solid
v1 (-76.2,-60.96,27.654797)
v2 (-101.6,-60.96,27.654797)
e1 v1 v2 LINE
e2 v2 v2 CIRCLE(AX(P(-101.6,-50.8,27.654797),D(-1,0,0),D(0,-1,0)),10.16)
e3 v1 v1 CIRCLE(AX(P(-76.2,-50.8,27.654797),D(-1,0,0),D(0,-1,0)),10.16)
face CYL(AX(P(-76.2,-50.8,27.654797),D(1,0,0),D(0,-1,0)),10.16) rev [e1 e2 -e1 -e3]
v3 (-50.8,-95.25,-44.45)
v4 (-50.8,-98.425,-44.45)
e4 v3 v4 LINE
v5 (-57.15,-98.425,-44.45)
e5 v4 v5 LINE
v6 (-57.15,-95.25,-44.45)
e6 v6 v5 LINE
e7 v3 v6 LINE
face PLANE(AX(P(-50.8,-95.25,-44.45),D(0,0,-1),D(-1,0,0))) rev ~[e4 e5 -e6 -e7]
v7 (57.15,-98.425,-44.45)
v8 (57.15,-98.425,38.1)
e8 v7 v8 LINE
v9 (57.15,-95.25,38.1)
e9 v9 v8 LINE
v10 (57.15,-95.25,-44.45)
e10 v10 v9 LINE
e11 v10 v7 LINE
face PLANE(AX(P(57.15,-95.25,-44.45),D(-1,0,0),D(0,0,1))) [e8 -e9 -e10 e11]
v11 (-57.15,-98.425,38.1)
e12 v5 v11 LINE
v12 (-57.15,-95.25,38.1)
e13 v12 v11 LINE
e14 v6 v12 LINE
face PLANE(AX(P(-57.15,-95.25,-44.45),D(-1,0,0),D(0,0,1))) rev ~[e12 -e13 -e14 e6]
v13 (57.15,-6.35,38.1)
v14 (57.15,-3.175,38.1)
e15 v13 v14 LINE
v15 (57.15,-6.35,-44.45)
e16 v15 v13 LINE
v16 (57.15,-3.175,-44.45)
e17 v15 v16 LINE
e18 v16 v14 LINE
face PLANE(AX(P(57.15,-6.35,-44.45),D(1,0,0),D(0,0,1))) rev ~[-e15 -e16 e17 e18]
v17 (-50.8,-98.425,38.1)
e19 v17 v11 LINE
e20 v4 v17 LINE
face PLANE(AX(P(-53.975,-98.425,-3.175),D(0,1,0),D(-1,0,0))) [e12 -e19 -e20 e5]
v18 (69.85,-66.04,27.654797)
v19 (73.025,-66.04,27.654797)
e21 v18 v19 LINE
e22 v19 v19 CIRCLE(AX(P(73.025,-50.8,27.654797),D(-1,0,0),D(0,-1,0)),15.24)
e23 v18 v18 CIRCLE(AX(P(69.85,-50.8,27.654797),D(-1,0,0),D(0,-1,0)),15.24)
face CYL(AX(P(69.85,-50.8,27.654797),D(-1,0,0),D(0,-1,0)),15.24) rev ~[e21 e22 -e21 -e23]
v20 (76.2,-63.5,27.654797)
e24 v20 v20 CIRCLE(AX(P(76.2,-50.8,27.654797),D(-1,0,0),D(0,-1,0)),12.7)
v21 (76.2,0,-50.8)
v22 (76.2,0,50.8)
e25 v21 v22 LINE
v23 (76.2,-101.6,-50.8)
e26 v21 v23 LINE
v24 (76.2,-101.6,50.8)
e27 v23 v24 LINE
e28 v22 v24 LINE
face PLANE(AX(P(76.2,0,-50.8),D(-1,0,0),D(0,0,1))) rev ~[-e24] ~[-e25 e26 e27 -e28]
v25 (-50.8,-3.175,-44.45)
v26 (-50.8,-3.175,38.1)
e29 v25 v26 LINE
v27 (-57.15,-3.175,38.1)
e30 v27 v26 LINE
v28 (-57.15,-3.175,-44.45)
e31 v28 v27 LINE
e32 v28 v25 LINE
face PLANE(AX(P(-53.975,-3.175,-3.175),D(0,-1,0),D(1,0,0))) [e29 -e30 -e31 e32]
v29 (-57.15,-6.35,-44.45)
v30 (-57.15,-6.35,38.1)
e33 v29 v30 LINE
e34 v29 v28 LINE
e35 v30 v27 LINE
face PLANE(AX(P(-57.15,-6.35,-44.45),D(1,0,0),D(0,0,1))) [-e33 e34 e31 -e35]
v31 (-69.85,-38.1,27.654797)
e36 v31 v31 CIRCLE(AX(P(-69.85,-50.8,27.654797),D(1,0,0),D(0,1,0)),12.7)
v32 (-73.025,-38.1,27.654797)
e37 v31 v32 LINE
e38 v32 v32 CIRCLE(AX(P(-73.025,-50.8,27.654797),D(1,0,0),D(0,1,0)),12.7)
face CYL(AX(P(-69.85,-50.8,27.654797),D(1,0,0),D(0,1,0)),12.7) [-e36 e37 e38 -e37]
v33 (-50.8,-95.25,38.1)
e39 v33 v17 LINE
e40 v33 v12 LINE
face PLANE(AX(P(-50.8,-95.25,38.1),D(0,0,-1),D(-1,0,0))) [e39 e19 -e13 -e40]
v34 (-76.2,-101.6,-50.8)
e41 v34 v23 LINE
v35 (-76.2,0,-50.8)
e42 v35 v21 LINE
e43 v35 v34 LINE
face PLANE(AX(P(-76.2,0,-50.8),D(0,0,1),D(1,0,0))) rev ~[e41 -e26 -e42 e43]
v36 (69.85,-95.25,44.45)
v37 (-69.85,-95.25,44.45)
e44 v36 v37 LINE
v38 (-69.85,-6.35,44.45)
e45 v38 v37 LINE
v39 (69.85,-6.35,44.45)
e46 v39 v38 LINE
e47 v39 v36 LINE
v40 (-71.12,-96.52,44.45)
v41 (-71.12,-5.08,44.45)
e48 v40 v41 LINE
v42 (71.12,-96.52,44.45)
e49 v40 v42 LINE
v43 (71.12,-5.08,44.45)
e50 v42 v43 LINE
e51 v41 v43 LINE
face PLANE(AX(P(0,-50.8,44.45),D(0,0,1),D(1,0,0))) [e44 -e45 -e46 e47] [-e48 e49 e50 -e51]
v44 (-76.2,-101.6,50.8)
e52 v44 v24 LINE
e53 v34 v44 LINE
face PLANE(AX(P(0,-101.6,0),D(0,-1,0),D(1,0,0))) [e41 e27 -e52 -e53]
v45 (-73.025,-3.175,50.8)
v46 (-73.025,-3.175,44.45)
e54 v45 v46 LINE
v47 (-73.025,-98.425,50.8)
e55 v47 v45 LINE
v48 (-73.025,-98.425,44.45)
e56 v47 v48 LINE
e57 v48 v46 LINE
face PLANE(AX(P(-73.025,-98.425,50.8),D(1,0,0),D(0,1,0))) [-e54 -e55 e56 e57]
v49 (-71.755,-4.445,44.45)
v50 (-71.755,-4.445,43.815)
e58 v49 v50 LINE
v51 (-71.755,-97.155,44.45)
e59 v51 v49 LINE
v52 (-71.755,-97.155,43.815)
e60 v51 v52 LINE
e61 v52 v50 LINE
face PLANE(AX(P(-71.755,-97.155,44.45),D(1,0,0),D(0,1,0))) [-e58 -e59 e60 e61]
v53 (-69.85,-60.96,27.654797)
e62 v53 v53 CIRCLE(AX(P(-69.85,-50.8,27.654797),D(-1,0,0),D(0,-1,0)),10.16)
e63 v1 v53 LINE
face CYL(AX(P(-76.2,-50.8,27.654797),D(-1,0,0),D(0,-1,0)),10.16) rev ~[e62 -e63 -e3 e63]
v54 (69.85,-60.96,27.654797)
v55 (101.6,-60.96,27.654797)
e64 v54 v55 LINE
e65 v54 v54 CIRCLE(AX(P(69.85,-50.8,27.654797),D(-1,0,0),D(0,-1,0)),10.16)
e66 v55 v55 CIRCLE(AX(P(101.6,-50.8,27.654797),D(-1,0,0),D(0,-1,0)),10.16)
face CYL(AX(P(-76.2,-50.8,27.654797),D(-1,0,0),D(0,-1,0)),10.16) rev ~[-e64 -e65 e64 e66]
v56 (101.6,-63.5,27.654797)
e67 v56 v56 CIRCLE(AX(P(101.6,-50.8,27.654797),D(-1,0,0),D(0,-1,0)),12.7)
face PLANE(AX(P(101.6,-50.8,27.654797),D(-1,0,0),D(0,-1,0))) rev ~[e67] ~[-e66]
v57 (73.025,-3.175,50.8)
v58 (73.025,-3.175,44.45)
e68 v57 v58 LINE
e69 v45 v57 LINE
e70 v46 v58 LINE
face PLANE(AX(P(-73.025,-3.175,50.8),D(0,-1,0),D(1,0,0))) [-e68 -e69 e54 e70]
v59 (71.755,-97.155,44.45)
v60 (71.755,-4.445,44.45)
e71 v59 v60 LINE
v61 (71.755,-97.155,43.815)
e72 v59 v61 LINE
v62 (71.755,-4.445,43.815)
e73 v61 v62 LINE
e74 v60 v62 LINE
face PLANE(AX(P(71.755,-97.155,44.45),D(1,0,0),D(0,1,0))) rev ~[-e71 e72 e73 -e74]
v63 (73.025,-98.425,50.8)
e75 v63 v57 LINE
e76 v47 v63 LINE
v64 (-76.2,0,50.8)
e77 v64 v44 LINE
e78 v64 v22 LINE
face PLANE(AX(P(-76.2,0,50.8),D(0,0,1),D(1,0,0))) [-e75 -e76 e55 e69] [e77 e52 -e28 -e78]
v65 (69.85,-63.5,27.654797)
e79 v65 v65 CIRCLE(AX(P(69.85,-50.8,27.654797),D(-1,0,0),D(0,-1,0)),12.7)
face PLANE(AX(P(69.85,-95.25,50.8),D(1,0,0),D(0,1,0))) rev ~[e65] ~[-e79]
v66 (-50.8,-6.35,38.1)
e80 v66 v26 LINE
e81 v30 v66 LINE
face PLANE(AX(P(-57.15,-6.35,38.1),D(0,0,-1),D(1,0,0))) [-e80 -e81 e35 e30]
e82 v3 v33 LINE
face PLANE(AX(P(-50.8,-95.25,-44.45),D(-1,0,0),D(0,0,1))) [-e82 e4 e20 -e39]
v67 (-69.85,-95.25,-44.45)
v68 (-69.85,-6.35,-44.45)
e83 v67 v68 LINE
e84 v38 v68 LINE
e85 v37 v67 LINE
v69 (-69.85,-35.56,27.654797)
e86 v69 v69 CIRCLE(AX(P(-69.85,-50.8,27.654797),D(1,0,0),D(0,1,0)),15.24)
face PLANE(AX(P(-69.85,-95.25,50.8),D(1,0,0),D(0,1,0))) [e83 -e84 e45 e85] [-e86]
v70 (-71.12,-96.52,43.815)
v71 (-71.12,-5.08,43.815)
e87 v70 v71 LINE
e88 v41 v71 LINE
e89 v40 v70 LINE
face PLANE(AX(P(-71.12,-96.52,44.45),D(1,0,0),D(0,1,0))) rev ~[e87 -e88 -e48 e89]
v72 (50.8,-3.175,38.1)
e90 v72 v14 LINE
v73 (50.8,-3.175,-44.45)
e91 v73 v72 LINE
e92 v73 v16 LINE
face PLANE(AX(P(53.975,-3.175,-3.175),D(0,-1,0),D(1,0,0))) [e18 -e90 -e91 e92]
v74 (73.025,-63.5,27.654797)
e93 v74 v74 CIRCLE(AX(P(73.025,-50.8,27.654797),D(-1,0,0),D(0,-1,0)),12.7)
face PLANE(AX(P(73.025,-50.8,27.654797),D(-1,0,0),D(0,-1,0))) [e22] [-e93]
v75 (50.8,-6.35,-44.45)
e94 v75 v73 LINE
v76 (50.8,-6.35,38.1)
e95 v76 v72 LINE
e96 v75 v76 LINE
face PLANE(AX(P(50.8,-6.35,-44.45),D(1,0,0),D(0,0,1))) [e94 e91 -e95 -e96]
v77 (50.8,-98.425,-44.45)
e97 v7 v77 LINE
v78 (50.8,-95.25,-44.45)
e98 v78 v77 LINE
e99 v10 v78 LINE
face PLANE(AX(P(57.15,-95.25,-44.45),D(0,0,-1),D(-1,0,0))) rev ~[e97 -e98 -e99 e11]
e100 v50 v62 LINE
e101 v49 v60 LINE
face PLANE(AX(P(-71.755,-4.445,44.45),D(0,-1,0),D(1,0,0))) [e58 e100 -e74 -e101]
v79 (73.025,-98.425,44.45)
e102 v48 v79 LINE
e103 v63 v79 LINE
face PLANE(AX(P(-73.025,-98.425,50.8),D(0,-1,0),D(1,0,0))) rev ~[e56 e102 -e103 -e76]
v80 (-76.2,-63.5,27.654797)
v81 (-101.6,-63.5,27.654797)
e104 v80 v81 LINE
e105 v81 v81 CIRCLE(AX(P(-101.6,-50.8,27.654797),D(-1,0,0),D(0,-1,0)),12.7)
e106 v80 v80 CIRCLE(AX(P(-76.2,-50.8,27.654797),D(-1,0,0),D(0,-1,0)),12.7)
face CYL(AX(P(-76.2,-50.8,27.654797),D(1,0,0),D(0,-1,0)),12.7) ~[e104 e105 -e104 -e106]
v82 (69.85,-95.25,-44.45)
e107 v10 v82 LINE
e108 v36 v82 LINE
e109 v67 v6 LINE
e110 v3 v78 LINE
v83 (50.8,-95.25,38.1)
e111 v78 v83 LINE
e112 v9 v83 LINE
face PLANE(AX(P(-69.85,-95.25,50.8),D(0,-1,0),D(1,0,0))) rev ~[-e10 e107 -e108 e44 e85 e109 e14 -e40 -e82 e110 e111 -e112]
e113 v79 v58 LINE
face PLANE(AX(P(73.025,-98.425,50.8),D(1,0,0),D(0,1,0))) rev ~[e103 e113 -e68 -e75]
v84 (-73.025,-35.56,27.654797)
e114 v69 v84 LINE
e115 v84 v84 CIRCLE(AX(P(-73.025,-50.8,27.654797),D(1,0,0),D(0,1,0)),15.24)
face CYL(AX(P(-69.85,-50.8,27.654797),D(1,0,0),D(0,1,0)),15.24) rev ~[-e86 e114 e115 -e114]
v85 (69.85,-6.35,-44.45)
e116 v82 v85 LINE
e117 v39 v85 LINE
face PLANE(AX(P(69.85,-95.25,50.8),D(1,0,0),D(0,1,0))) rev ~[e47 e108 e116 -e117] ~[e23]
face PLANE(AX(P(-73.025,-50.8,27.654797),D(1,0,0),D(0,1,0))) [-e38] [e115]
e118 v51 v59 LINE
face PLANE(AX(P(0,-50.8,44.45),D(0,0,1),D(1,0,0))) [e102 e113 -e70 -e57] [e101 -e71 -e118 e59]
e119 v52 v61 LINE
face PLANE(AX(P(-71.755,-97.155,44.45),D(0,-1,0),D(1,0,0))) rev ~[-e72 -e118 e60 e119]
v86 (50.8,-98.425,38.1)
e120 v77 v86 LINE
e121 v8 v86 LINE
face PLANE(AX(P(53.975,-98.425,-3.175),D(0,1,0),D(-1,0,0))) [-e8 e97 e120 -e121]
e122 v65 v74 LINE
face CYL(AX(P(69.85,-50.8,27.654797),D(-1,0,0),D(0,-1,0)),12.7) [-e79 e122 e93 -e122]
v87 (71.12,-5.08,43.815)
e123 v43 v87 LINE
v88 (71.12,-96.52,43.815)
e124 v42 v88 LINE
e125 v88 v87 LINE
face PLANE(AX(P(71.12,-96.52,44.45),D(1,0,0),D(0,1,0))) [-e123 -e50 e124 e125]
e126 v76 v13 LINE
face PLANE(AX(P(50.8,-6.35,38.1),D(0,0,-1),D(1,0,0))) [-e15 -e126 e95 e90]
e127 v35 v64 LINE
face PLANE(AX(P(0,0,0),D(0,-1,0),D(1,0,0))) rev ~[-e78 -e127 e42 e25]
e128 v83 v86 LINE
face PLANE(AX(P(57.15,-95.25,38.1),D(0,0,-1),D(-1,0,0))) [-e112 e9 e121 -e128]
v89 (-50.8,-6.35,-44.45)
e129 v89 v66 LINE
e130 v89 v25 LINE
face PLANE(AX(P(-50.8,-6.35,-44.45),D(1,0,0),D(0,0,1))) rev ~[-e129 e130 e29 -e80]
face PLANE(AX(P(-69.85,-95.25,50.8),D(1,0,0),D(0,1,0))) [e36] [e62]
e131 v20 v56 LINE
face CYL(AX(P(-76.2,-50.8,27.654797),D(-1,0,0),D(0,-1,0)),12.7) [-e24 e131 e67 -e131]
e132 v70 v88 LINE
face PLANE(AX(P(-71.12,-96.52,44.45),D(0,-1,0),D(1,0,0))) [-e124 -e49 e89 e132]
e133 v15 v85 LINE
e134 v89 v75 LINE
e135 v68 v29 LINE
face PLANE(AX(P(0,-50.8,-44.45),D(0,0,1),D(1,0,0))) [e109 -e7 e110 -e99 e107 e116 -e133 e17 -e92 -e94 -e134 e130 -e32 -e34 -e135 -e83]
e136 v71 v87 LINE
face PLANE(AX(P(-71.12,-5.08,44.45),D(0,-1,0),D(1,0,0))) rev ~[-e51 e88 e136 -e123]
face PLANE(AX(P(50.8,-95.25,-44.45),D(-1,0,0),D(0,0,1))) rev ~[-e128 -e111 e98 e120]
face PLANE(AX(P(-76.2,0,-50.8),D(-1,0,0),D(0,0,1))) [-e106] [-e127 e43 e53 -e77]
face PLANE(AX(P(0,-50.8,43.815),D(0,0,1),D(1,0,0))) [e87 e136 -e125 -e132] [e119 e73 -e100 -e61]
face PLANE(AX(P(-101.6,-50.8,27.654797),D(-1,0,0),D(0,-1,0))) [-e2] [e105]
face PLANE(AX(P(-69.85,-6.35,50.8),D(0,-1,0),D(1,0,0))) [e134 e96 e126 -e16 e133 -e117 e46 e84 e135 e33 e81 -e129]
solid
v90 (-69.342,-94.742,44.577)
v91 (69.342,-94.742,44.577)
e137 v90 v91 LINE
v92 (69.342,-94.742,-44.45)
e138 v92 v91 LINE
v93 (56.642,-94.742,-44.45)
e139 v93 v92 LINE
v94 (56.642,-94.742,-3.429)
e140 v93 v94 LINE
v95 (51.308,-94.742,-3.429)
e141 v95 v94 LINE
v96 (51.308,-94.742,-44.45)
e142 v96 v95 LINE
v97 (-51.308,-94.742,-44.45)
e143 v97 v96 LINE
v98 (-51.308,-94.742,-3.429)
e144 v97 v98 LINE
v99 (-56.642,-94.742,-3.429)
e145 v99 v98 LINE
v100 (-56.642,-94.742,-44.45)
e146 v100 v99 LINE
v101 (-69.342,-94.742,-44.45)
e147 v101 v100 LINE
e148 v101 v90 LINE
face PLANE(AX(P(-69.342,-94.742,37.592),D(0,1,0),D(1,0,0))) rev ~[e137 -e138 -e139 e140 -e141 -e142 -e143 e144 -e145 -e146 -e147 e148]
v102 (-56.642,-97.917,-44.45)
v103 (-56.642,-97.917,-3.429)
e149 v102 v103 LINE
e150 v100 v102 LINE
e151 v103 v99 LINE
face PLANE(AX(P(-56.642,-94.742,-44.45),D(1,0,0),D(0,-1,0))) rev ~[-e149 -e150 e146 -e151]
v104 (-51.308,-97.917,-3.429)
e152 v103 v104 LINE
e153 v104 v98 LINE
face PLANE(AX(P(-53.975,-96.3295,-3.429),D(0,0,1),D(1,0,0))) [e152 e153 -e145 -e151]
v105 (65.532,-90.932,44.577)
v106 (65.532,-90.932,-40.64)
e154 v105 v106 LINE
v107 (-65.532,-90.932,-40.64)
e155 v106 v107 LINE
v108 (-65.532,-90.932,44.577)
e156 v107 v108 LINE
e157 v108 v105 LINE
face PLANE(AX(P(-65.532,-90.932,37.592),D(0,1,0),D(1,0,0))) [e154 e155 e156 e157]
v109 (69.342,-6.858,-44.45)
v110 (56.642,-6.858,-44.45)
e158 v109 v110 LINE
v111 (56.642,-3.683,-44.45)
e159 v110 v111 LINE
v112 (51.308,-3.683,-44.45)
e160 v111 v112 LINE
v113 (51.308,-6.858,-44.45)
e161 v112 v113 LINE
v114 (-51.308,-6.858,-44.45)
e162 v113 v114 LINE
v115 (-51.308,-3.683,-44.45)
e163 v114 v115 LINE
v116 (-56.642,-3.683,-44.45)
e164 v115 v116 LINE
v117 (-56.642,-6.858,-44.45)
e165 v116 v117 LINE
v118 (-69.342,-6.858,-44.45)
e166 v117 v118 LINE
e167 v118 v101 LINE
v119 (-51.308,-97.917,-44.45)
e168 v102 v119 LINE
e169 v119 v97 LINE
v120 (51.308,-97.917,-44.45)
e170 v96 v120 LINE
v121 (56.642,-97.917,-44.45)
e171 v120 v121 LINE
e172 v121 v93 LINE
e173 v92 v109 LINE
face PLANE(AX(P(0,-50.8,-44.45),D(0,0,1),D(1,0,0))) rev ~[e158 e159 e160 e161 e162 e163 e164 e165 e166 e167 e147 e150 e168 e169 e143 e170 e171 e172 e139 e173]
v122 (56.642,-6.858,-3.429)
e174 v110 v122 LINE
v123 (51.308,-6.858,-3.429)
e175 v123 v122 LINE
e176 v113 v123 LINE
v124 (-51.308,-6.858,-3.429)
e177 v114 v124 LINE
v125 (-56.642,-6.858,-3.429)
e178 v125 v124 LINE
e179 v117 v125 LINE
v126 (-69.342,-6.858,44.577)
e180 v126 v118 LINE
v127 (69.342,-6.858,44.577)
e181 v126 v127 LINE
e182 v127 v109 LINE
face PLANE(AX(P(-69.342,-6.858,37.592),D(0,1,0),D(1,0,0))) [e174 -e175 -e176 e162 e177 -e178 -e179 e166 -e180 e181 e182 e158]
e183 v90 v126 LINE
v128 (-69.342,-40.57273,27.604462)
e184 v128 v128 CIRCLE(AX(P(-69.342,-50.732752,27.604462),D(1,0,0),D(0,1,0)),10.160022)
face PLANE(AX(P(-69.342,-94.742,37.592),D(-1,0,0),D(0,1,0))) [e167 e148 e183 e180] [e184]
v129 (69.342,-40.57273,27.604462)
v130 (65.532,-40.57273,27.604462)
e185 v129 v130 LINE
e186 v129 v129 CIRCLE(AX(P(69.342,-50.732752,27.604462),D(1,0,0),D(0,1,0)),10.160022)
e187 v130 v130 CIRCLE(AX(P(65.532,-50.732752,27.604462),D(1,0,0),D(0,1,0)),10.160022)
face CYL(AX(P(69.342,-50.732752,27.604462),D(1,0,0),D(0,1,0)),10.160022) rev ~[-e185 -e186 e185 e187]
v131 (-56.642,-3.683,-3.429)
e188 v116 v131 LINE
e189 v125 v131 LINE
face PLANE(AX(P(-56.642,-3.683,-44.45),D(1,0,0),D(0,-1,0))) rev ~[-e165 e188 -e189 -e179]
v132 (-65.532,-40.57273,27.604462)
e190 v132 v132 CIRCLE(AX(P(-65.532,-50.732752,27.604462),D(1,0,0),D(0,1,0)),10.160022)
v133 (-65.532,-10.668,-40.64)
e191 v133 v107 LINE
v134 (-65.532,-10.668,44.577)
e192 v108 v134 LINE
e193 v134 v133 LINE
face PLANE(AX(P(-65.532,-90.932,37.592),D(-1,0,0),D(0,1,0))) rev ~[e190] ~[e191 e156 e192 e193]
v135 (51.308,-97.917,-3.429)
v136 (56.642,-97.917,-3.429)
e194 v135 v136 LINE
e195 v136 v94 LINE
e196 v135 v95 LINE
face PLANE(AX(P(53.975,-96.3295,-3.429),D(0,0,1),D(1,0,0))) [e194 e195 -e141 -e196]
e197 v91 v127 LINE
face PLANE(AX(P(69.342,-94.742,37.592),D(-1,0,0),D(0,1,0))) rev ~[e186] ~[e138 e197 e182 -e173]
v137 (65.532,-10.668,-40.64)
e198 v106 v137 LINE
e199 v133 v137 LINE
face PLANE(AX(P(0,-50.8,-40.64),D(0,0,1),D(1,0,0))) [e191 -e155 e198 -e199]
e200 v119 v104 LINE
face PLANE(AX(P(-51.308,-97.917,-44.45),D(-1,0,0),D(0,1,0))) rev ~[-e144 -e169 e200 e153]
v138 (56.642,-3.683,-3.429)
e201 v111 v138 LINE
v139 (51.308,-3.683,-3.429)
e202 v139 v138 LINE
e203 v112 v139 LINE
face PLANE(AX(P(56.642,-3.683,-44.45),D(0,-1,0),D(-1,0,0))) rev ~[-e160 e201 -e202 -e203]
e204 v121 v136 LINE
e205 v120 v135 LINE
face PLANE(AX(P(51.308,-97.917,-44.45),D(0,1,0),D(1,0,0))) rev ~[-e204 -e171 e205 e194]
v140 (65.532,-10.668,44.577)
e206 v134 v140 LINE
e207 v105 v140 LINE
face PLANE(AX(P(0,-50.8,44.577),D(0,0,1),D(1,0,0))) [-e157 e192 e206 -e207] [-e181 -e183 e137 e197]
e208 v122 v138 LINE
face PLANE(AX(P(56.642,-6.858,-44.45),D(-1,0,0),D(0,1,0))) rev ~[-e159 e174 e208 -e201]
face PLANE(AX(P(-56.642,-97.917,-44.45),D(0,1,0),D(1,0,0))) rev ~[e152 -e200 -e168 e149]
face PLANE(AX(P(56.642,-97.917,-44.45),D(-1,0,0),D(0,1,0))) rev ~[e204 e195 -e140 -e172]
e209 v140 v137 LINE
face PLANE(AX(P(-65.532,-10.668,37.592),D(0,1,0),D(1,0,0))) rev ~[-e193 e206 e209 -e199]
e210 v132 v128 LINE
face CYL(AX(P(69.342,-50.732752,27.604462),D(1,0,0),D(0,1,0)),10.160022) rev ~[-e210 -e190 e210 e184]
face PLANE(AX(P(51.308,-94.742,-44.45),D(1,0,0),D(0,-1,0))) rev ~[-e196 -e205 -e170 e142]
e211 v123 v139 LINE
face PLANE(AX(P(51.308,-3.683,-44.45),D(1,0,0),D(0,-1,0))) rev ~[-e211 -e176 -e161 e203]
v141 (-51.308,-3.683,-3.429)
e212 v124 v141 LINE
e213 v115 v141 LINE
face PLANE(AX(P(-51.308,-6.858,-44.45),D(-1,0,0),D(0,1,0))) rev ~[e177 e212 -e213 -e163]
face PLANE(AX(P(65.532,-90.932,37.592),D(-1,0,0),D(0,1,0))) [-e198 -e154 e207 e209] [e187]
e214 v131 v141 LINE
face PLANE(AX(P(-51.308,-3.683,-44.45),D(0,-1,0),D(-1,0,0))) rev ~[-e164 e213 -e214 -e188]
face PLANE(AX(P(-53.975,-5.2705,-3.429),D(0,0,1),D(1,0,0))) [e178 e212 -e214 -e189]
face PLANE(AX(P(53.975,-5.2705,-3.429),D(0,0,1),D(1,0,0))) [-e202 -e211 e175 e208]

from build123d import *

# Parameters (mm, degrees)
F0_W          = 152.4
F0_H          = 101.6
F1_DEPTH      = 101.6
F2_R          = 12.7
F2_R_2        = 10.16
F3_DEPTH      = 25.4
F3_DEPTH_BACK = 177.8
F4_R          = 10.16
F5_DEPTH      = 152.4
F6_W          = 139.7
F6_H          = 88.9
F7_DEPTH      = 95.25
F8_W          = 146.05
F8_H          = 95.25
F9_DEPTH      = 6.35
F10_W         = 6.35
F10_H         = 82.55
F11_DEPTH     = 3.175
F12_W         = 143.51
F12_H         = 92.71
F12_W_2       = 142.24
F12_H_2       = 91.44
F13_DEPTH     = 0.635
F14_R         = 15.24
F14_R_2       = 12.7
F15_DEPTH     = 3.175
F16_R         = 15.24
F16_R_2       = 12.7
F17_DEPTH     = 3.175
F18_W         = 6.35
F18_H         = 82.55
F19_DEPTH     = 3.175
F21_DEPTH     = 82.042
F22_W         = 5.334
F22_H         = 3.175
F23_DEPTH     = 41.021
F24_T         = 3.81
F24_T3_DEPTH  = 48.641
F24_T5_DEPTH  = 12.954
F24_T7_DEPTH  = 12.954
F25_W         = 138.684
F25_H         = 87.884
F25_W_2       = 131.064
F25_H_2       = 80.264
F26_DEPTH     = 6.985
F27_R         = 10.1600221016
F28_DEPTH     = 152.4


# Not quite as in the source:
# - a shell that OpenCascade refuses in one call is made with other operations: the cavity is built on its own and cut out


with BuildPart() as f1:
    # F0 (on Front) → F1 (new body)
    with BuildSketch(Plane.XZ):
        Rectangle(F0_W, F0_H)
    extrude(amount=F1_DEPTH)

    # F2 (on face) → F3 (join, two sides)
    with BuildSketch(Plane(origin=(-76.2, 0, 0), x_dir=(0, -1, 0), z_dir=(-1, 0, 0))) as f3_sk:
        with Locations((50.8, 27.6547968388)):
            Circle(F2_R)
        with Locations((50.8, 27.6547968388)):
            Circle(F2_R_2, mode=Mode.SUBTRACT)
    extrude(amount=F3_DEPTH)
    extrude(f3_sk.sketch, amount=-F3_DEPTH_BACK)

    # F4 (on face) → F5 (cut)
    with BuildSketch(Plane(origin=(-76.2, 0, 0), x_dir=(0, -1, 0), z_dir=(-1, 0, 0))):
        with Locations((50.8, 27.6547968388)):
            Circle(F4_R)
    extrude(amount=-F5_DEPTH, mode=Mode.SUBTRACT)

    # F6 (on face) → F7 (cut)
    with BuildSketch(Plane.XY.offset(50.8)):
        with Locations((0, -50.8)):
            Rectangle(F6_W, F6_H)
    extrude(amount=-F7_DEPTH, mode=Mode.SUBTRACT)

    # F8 (on face) → F9 (cut)
    with BuildSketch(Plane.XY.offset(50.8)):
        with Locations((0, -50.8)):
            Rectangle(F8_W, F8_H)
    extrude(amount=-F9_DEPTH, mode=Mode.SUBTRACT)

    # F10 (on face) → F11 (cut)
    with BuildSketch(Plane.XZ.offset(6.35)):
        with Locations((-53.975, -3.175)):
            Rectangle(F10_W, F10_H)
        with Locations((53.975, -3.175)):
            Rectangle(F10_W, F10_H)
    extrude(amount=-F11_DEPTH, mode=Mode.SUBTRACT)

    # F12 (on face) → F13 (cut)
    with BuildSketch(Plane.XY.offset(44.45)):
        with Locations((0, -50.8)):
            Rectangle(F12_W, F12_H)
        with Locations((0, -50.8)):
            Rectangle(F12_W_2, F12_H_2, mode=Mode.SUBTRACT)
    extrude(amount=-F13_DEPTH, mode=Mode.SUBTRACT)

    # F14 (on face) → F15 (cut)
    with BuildSketch(Plane.YZ.offset(-69.85)):
        with Locations((-50.8, 27.6547968388)):
            Circle(F14_R)
        with Locations((-50.8, 27.6547968388)):
            Circle(F14_R_2, mode=Mode.SUBTRACT)
    extrude(amount=-F15_DEPTH, mode=Mode.SUBTRACT)

    # F16 (on face) → F17 (cut)
    with BuildSketch(Plane(origin=(69.85, 0, 0), x_dir=(0, -1, 0), z_dir=(-1, 0, 0))):
        with Locations((50.8, 27.6547968388)):
            Circle(F16_R)
        with Locations((50.8, 27.6547968388)):
            Circle(F16_R_2, mode=Mode.SUBTRACT)
    extrude(amount=-F17_DEPTH, mode=Mode.SUBTRACT)

    # F18 (on face) → F19 (cut)
    with BuildSketch(Plane(origin=(0, -95.25, 0), x_dir=(-1, 0, 0), z_dir=(0, 1, 0))):
        with Locations((53.975, -3.175)):
            Rectangle(F18_W, F18_H)
        with Locations((-53.975, -3.175)):
            Rectangle(F18_W, F18_H)
    extrude(amount=-F19_DEPTH, mode=Mode.SUBTRACT)


with BuildPart() as f21:
    # F20 (on face) → F21 (new body)
    with BuildSketch(Plane.XY.offset(-44.45)):
        Polygon((51.308, -97.917), (56.642, -97.917), (56.642, -94.742), (69.342, -94.742), (69.342, -6.858), (56.642, -6.858), (56.642, -3.683), (51.308, -3.683), (51.308, -6.858), (-51.308, -6.858), (-51.308, -3.683), (-56.642, -3.683), (-56.642, -6.858), (-69.342, -6.858), (-69.342, -94.742), (-56.642, -94.742), (-56.642, -97.917), (-51.308, -97.917), (-51.308, -94.742), (51.308, -94.742), align=None)
    extrude(amount=F21_DEPTH)

    # F22 (on face) → F23 (cut)
    with BuildSketch(Plane.XY.offset(37.592)):
        with Locations((53.975, -5.2705)):
            Rectangle(F22_W, F22_H)
        with Locations((53.975, -96.3295)):
            Rectangle(F22_W, F22_H)
        with Locations((-53.975, -96.3295)):
            Rectangle(F22_W, F22_H)
        with Locations((-53.975, -5.2705)):
            Rectangle(F22_W, F22_H)
    extrude(amount=-F23_DEPTH, mode=Mode.SUBTRACT)

    # F24: shell of thickness 3.81, made by hand


with BuildPart() as f24_core1:
    # F24_t2: copy of F21
    add(f21.part)

    # the walls: a layer under each face that stays
    f24_faces = [f24_core1.faces().sort_by_distance(p)[0] for p in [
        (53.975, -97.917, -23.9395),
        (51.308, -96.3295, -23.9395),
        (0, -94.742, -3.429),
        (69.342, -50.8, -3.429),
        (0, -6.858, -3.429),
        (56.642, -5.2705, -23.9395),
        (53.975, -3.683, -23.9395),
        (53.975, -5.2705, -3.429),
        (51.308, -5.2705, -23.9395),
        (-51.308, -5.2705, -23.9395),
        (-53.975, -3.683, -23.9395),
        (-53.975, -5.2705, -3.429),
        (-56.642, -5.2705, -23.9395),
        (-69.342, -50.8, -3.429),
        (-56.642, -96.3295, -23.9395),
        (-53.975, -97.917, -23.9395),
        (-53.975, -96.3295, -3.429),
        (-51.308, -96.3295, -23.9395),
        (53.975, -96.3295, -3.429),
        (56.642, -96.3295, -23.9395),
        (0, -50.8, -44.45),
    ]]
    thicken(f24_faces, amount=-F24_T, mode=Mode.SUBTRACT)

    # F24_s4 → F24_t3 (cut)
    with BuildSketch(Plane.XY.offset(-48.26)):
        Polygon((51.2699, -94.7801), (55.118, -94.742), (55.118, -90.932), (51.308, -90.932), align=None)
        Polygon((56.6801, -94.7801), (56.642, -90.932), (52.832, -90.932), (52.832, -94.742), align=None)
        Polygon((-51.2699, -94.7801), (-51.308, -90.932), (-55.118, -90.932), (-55.118, -94.742), align=None)
        Polygon((-56.6801, -94.7801), (-56.642, -90.932), (-52.832, -90.932), (-52.832, -94.742), align=None)
        Polygon((-56.6801, -6.8199), (-56.642, -10.668), (-52.832, -10.668), (-52.832, -6.858), align=None)
        Polygon((-51.2699, -6.8199), (-51.308, -10.668), (-55.118, -10.668), (-55.118, -6.858), align=None)
        Polygon((51.2699, -6.8199), (51.308, -10.668), (55.118, -10.668), (55.118, -6.858), align=None)
        Polygon((56.6801, -6.8199), (56.642, -10.668), (52.832, -10.668), (52.832, -6.858), align=None)
    extrude(amount=F24_T3_DEPTH, mode=Mode.SUBTRACT)

    # F24_s6 → F24_t5 (cut)
    with BuildSketch(Plane.YZ.offset(47.498)):
        Polygon((-94.7801, -3.3909), (-90.932, -3.429), (-90.932, -7.239), (-94.742, -7.239), align=None)
        Polygon((-6.8199, -3.3909), (-10.668, -3.429), (-10.668, -7.239), (-6.858, -7.239), align=None)
    extrude(amount=F24_T5_DEPTH, mode=Mode.SUBTRACT)

    # F24_s8 → F24_t7 (cut)
    with BuildSketch(Plane.YZ.offset(-60.452)):
        Polygon((-94.7801, -3.3909), (-90.932, -3.429), (-90.932, -7.239), (-94.742, -7.239), align=None)
        Polygon((-6.8199, -3.3909), (-10.668, -3.429), (-10.668, -7.239), (-6.858, -7.239), align=None)
    extrude(amount=F24_T7_DEPTH, mode=Mode.SUBTRACT)


with BuildPart() as f21_1:
    add(f21.part)

    # what is left inside the walls is the cavity
    f24_cavity = [f24_core1.part.solids().sort_by_distance(p)[0] for p in [
        (0, -64.177333, -40.6019),
    ]]
    add(f24_cavity, mode=Mode.SUBTRACT)

    # F25 (on face) → F26 (join)
    with BuildSketch(Plane.XY.offset(37.592)):
        with Locations((0, -50.8)):
            Rectangle(F25_W, F25_H)
        with Locations((0, -50.8)):
            Rectangle(F25_W_2, F25_H_2, mode=Mode.SUBTRACT)
    extrude(amount=F26_DEPTH)

    # F27 (on face) → F28 (cut)
    with BuildSketch(Plane.YZ.offset(69.342)):
        with Locations((-50.732751833, 27.6044615543)):
            Circle(F27_R)
    extrude(amount=-F28_DEPTH, mode=Mode.SUBTRACT)


solid = Compound([f1.part, f21_1.part])
